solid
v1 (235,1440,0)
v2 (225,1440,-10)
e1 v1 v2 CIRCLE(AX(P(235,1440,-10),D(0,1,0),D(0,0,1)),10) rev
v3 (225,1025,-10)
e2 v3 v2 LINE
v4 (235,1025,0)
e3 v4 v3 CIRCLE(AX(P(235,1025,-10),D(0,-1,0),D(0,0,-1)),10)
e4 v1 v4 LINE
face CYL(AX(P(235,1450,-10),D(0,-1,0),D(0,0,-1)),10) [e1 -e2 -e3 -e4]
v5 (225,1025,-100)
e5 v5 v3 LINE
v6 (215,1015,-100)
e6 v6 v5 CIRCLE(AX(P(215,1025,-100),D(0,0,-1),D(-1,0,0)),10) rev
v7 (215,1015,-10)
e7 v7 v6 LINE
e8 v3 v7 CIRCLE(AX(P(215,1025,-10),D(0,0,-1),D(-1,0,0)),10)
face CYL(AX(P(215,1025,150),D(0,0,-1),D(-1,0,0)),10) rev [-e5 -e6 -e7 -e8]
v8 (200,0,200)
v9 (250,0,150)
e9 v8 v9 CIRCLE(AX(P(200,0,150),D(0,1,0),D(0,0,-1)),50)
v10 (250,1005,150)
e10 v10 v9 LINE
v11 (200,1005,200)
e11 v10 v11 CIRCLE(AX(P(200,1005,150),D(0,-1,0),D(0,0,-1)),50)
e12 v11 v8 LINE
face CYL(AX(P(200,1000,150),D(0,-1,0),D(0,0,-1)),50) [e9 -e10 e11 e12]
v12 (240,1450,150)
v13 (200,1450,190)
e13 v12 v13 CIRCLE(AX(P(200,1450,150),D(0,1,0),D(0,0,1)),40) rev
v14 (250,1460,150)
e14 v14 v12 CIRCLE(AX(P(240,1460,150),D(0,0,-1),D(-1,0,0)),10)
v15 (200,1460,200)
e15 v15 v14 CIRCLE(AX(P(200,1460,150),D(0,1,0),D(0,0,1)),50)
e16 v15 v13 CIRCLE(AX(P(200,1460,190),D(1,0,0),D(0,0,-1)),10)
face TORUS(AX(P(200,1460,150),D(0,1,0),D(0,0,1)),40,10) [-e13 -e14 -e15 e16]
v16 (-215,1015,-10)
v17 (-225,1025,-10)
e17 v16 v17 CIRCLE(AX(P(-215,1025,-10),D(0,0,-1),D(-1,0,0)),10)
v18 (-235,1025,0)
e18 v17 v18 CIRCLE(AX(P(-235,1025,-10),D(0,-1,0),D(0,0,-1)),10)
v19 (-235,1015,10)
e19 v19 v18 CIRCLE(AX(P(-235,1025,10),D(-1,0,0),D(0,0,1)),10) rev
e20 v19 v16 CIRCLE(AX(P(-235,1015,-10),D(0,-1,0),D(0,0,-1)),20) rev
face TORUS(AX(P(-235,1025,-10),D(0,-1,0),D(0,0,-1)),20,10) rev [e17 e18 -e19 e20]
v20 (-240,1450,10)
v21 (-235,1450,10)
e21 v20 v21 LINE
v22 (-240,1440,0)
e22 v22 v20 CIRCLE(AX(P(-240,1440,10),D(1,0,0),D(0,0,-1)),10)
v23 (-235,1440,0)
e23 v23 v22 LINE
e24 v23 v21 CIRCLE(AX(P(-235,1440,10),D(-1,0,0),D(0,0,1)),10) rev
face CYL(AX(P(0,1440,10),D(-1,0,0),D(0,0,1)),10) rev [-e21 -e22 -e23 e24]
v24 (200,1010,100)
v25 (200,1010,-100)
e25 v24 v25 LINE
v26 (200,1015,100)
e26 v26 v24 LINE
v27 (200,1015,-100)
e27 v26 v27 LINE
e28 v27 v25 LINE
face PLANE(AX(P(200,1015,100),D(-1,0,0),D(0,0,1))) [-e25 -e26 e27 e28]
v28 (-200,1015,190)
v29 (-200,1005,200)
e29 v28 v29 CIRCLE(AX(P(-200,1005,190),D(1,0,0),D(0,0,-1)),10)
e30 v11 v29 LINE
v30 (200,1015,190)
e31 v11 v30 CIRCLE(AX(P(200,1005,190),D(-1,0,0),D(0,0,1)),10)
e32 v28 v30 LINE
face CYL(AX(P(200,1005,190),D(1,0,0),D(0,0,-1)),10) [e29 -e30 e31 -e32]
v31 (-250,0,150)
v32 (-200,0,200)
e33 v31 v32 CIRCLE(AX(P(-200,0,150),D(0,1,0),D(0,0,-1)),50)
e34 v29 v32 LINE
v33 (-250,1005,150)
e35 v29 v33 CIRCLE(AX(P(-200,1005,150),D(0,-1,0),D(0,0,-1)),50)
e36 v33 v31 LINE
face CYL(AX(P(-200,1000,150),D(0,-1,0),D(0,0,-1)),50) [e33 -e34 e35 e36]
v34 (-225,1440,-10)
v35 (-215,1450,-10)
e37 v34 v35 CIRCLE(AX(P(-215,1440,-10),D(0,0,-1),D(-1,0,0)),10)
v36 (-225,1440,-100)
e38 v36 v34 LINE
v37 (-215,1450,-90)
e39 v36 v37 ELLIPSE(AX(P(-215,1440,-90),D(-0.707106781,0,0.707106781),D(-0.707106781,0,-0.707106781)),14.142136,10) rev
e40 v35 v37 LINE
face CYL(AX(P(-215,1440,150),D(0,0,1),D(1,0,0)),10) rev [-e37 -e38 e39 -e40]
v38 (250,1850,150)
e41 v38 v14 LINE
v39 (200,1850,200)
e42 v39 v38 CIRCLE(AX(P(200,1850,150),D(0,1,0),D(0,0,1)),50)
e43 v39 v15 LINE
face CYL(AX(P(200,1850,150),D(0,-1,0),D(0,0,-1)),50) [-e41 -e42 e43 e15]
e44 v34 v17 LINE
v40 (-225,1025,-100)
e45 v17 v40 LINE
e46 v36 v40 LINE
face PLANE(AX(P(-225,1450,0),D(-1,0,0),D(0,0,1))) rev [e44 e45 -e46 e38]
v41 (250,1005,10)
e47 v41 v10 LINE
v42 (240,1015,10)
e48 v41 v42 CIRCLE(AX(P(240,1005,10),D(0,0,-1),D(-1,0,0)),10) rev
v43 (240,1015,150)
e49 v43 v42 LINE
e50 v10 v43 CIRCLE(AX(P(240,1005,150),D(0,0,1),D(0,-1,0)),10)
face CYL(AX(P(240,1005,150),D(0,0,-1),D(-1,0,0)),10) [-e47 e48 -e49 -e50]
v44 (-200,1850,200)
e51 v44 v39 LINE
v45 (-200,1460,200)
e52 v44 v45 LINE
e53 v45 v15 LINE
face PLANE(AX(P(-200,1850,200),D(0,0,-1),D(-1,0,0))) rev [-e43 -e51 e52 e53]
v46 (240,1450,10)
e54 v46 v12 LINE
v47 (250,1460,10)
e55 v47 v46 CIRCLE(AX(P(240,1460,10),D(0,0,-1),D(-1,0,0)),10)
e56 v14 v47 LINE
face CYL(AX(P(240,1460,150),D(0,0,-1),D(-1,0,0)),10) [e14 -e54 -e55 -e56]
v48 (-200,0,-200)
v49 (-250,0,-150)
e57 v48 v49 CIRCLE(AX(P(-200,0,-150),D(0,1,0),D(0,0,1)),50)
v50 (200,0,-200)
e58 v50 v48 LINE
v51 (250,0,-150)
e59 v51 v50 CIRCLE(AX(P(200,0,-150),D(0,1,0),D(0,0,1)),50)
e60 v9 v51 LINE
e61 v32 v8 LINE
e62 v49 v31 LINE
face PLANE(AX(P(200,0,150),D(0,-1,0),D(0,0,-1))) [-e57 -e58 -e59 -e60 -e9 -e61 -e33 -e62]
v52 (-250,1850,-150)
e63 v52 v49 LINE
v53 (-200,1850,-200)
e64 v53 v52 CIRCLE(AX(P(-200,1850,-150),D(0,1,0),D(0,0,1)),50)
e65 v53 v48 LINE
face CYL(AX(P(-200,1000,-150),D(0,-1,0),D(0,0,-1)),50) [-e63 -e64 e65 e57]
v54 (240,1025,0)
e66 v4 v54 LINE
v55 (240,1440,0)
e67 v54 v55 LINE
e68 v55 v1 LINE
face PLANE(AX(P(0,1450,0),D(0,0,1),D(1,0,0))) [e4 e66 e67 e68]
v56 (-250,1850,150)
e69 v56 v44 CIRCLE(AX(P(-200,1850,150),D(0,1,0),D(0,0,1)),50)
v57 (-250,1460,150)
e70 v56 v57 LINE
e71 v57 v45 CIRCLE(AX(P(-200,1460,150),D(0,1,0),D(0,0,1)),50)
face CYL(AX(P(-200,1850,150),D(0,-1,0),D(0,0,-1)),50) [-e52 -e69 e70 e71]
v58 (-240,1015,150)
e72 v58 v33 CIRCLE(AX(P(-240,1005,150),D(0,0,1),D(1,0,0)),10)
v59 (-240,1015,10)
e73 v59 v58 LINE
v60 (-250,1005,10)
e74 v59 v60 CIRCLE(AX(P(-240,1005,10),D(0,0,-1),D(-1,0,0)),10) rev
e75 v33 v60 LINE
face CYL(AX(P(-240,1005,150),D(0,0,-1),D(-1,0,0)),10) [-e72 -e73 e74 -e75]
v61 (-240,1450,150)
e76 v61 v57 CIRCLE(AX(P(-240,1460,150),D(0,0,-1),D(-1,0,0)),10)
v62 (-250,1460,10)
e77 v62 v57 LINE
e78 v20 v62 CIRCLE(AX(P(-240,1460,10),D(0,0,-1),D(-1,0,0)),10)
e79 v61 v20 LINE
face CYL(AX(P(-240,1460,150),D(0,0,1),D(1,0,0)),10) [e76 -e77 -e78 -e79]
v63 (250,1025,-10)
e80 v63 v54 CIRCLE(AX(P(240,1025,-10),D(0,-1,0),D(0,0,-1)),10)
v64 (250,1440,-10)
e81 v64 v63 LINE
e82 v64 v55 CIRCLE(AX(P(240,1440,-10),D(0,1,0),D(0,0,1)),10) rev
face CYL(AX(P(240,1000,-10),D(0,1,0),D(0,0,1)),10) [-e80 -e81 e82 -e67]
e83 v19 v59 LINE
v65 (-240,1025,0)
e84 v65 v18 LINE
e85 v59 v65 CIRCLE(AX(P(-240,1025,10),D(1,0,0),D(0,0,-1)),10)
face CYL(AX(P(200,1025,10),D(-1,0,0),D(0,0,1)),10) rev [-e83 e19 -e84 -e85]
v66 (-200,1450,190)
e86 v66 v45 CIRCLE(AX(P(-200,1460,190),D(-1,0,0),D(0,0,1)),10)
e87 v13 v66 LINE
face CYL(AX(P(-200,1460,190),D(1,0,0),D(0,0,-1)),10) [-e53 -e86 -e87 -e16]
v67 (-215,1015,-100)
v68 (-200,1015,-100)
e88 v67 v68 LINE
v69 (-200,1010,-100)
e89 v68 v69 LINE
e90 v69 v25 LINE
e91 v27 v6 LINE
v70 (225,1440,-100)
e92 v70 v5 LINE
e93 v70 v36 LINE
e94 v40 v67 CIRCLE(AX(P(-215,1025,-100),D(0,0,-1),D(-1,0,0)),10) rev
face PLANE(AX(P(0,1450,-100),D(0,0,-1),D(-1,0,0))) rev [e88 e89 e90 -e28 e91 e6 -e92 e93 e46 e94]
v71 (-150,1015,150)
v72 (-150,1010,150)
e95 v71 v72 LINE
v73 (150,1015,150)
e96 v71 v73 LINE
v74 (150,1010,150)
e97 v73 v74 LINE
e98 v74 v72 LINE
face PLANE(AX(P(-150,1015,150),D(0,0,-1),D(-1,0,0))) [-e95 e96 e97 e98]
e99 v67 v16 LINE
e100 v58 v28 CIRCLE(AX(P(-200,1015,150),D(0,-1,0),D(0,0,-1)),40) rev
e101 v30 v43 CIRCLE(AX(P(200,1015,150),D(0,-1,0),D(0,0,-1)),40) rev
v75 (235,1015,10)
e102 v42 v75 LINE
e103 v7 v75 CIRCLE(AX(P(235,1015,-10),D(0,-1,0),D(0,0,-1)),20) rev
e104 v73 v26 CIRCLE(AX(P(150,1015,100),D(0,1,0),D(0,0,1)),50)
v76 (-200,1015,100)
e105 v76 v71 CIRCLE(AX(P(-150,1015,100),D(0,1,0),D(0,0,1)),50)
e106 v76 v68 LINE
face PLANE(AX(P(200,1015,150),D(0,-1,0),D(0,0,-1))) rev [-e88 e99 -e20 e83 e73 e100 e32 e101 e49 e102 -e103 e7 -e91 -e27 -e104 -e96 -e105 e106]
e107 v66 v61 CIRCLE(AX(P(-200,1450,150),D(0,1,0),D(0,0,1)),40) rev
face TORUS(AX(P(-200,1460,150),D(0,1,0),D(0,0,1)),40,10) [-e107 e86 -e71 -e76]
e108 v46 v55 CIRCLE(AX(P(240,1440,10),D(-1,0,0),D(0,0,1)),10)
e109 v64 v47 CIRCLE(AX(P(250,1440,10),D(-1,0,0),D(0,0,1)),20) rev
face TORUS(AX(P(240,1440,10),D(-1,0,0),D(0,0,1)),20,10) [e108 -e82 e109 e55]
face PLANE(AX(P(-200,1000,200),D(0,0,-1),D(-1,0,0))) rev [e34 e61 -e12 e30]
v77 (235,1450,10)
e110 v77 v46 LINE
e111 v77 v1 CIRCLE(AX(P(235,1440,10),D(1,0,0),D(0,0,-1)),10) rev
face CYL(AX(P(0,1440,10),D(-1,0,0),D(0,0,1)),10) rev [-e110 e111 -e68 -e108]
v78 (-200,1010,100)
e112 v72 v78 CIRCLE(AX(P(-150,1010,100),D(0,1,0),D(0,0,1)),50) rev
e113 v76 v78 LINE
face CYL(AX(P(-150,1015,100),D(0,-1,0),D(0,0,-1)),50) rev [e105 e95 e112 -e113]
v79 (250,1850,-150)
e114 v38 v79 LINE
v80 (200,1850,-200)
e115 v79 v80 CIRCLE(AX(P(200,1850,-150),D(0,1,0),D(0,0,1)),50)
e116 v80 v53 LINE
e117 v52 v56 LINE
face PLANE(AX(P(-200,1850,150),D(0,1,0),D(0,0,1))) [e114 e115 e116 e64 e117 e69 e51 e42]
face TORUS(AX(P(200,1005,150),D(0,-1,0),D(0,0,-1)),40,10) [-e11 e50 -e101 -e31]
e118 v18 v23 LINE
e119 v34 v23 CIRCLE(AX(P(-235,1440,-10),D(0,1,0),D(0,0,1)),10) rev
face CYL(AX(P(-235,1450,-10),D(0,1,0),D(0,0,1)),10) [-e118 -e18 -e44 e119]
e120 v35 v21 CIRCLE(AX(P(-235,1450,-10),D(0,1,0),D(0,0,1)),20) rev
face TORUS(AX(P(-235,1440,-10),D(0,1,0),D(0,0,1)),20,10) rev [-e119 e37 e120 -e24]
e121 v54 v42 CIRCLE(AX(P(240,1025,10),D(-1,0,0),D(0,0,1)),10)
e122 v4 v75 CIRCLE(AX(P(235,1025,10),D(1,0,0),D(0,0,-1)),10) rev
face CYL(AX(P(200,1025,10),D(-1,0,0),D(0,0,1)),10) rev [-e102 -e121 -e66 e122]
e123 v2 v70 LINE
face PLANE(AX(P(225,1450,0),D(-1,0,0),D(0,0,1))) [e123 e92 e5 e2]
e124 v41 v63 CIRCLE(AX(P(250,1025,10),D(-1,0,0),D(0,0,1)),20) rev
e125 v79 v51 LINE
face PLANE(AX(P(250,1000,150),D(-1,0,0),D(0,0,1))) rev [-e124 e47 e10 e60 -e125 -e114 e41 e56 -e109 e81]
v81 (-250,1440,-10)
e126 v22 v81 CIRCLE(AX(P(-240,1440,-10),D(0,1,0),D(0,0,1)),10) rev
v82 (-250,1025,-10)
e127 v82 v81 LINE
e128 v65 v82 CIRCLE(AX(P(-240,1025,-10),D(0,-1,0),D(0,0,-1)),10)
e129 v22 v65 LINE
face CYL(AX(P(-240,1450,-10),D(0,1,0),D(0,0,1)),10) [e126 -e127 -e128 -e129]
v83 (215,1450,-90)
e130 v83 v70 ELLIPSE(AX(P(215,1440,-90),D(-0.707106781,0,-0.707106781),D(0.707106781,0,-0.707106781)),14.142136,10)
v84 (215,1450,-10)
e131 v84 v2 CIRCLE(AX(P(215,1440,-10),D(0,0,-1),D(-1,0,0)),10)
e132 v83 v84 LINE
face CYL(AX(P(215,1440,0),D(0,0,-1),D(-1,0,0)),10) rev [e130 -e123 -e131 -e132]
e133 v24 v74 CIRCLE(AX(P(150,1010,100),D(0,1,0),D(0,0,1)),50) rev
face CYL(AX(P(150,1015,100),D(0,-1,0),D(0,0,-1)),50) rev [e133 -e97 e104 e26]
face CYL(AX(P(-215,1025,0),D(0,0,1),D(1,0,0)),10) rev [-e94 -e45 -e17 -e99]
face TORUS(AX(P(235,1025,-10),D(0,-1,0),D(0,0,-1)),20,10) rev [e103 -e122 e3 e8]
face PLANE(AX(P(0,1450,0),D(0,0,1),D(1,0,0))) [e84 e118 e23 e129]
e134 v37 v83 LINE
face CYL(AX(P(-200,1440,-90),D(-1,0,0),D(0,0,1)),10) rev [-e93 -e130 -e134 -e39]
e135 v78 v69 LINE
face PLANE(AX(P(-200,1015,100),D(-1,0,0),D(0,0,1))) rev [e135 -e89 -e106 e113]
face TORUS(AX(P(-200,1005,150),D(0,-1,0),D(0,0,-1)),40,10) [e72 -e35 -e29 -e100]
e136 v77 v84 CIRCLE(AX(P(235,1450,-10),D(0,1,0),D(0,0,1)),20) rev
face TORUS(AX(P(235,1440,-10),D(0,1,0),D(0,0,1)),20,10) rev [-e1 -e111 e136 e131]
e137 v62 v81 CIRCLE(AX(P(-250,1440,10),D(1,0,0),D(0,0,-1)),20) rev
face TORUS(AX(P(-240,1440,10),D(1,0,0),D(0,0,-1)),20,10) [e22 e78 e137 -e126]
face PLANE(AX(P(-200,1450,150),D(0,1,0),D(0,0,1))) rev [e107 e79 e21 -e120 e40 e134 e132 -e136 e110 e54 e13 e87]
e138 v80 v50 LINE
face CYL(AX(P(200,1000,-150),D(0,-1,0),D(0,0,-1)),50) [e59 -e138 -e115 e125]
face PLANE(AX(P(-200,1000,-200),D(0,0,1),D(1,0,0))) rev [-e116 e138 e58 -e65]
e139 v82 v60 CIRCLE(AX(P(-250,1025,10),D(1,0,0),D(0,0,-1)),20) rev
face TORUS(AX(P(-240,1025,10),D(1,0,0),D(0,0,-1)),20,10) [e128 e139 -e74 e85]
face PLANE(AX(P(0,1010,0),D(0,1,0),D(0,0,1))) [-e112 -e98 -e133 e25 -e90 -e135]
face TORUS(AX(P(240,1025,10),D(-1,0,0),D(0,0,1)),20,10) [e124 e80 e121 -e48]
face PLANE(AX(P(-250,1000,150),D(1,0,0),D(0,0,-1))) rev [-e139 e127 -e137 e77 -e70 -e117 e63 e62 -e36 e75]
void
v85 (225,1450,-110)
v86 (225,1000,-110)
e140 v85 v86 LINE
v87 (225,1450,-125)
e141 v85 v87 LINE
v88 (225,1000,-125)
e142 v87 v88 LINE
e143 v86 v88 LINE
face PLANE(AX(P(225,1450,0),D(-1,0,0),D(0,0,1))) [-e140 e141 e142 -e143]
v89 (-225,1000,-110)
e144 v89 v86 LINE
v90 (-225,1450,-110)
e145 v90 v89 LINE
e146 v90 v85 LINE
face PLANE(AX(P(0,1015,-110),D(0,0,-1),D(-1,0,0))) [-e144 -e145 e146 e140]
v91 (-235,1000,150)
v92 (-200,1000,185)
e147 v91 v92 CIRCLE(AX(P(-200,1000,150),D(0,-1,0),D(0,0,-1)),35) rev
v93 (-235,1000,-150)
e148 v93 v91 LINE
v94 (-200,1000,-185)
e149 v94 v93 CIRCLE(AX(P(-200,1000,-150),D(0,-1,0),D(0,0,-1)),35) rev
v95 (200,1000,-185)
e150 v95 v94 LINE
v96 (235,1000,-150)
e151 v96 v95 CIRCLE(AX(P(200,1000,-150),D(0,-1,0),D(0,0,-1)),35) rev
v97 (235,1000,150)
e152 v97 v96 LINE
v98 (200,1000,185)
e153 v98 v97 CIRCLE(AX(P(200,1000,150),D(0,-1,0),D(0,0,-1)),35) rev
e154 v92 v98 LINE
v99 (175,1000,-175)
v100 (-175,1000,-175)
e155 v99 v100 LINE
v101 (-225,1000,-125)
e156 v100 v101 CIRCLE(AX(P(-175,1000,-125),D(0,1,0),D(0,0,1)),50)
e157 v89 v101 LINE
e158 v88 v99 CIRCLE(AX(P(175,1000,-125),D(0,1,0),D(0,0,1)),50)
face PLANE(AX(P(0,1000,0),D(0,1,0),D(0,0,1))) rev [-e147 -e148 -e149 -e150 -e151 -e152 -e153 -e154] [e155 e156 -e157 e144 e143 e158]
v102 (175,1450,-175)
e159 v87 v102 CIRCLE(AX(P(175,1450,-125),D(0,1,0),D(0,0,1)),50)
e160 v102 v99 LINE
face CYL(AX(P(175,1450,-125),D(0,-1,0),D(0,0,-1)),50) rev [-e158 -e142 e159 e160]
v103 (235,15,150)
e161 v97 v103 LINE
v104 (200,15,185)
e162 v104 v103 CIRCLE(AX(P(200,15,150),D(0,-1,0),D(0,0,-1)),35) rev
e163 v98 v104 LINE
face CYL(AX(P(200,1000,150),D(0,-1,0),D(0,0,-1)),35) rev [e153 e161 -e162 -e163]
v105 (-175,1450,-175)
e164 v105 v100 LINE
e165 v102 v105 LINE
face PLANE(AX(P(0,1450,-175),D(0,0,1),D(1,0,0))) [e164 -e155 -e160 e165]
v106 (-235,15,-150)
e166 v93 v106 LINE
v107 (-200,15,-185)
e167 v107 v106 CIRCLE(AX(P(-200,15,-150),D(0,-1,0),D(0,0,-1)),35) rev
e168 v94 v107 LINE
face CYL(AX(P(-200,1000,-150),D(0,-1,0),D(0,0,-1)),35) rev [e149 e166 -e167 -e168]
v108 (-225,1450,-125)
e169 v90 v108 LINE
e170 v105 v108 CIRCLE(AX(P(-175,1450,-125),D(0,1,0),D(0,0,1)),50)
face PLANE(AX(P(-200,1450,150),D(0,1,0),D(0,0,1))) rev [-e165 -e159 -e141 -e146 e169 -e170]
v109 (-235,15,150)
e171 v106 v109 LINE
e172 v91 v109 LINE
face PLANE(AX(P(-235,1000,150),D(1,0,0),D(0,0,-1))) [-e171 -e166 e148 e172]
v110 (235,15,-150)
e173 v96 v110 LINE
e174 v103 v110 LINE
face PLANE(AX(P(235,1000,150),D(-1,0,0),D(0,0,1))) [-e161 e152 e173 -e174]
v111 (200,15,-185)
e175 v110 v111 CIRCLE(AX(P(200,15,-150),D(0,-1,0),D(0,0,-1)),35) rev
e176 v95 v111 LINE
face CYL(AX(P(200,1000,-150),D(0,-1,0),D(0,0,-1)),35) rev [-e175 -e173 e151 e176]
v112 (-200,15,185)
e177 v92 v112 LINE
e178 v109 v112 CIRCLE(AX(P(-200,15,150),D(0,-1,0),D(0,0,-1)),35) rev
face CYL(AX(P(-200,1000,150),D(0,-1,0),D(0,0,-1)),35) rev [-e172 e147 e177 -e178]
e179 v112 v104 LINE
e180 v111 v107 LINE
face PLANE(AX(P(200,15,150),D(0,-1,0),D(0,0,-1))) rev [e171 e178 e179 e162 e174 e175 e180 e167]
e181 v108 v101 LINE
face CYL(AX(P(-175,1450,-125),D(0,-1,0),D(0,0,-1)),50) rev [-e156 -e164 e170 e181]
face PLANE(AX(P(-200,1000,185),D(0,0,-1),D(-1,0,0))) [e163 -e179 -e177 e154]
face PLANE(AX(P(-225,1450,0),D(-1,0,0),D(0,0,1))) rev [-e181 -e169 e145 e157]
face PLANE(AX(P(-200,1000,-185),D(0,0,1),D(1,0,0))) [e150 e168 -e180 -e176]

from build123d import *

# Parameters (mm, degrees)
BOSS_EXTRUDE1_DEPTH = 1000
SHELL1_T            = -15
BOSS_EXTRUDE2_DEPTH = 10
BOSS_EXTRUDE3_DEPTH = 15
BOSS_EXTRUDE4_DEPTH = 450
BOSS_EXTRUDE7_DEPTH = 450
BOSS_EXTRUDE8_DEPTH = 400
FILLET3_R           = 10


# Read off the part's stored shape, not the designer's step: Boss-Extrude3
with BuildPart() as part:
    # Sketch1 → Boss-Extrude1 (new body)
    with BuildSketch(Plane(origin=(0, 0, 0), x_dir=(1, 0, 0), z_dir=(0, 1, 0))):
        with BuildLine():
            Line((-200, -200), (200, -200))
            ThreePointArc((200, -200), (235.355339059, -185.355339059), (250, -150))
            Line((250, -150), (250, 150))
            ThreePointArc((250, 150), (235.355339059, 185.355339059), (200, 200))
            Line((200, 200), (-200, 200))
            ThreePointArc((-200, 200), (-235.355339059, 185.355339059), (-250, 150))
            Line((-250, 150), (-250, -150))
            ThreePointArc((-250, -150), (-235.355339059, -185.355339059), (-200, -200))
        make_face()
    extrude(amount=BOSS_EXTRUDE1_DEPTH)

    # Shell1
    shell1_openings = [part.faces().sort_by_distance(p)[0] for p in [
        (0, 1000, 0),
    ]]
    offset(amount=SHELL1_T, openings=shell1_openings, kind=Kind.INTERSECTION)

    # Sketch3 → Boss-Extrude2 (add)
    with BuildSketch(Plane(origin=(0, 1000, 0), x_dir=(1, 0, 0), z_dir=(0, 1, 0))):
        with BuildLine():
            Line((200, 0), (200, 100))
            Line((200, 100), (-200, 100))
            Line((-200, 100), (-200, 0))
            Line((-200, 0), (-250, 0))
            Line((-250, 0), (-250, -150))
            ThreePointArc((-250, -150), (-235.355339059, -185.355339059), (-200, -200))
            Line((-200, -200), (200, -200))
            ThreePointArc((200, -200), (235.355339059, -185.355339059), (250, -150))
            Line((250, -150), (250, 0))
            Line((250, 0), (200, 0))
        make_face()
    extrude(amount=BOSS_EXTRUDE2_DEPTH)

    # Boss-Extrude3 outline → Boss-Extrude3 (add)
    with BuildSketch(Plane(origin=(0, 1000, 0), x_dir=(1, 0, 0), z_dir=(0, 1, 0))):
        with BuildLine():
            Line((200, 100), (200, -100))
            ThreePointArc((200, -100), (185.355339059, -135.355339059), (150, -150))
            Line((150, -150), (-150, -150))
            ThreePointArc((-150, -150), (-185.355339059, -135.355339059), (-200, -100))
            Line((-200, -100), (-200, 100))
            ThreePointArc((-200, 100), (-199.74680765, 105.0254481), (-198.989794856, 110))
            Line((-198.989794856, 110), (-225, 110))
            Line((-225, 110), (-225, 0))
            Line((-225, 0), (-250, 0))
            Line((-250, 0), (-250, -150))
            ThreePointArc((-250, -150), (-235.355339059, -185.355339059), (-200, -200))
            Line((-200, -200), (200, -200))
            ThreePointArc((200, -200), (235.355339059, -185.355339059), (250, -150))
            Line((250, -150), (250, 0))
            Line((250, 0), (225, 0))
            Line((225, 0), (225, 110))
            Line((225, 110), (198.989794856, 110))
            ThreePointArc((198.989794856, 110), (199.74680765, 105.0254481), (200, 100))
        make_face()
    extrude(amount=BOSS_EXTRUDE3_DEPTH)

    # Sketch3<5> → Boss-Extrude4 (add)
    with BuildSketch(Plane(origin=(0, 1000, 0), x_dir=(1, 0, 0), z_dir=(0, 1, 0))):
        with BuildLine():
            Line((-250, 0), (-225, 0))
            Line((-225, 0), (-225, 100))
            Line((-225, 100), (-225, 110))
            Line((-225, 110), (-225, 125))
            ThreePointArc((-225, 125), (-210.355339059, 160.355339059), (-175, 175))
            Line((-175, 175), (175, 175))
            ThreePointArc((175, 175), (210.355339059, 160.355339059), (225, 125))
            Line((225, 125), (225, 110))
            Line((225, 110), (225, 100))
            Line((225, 100), (225, 0))
            Line((225, 0), (250, 0))
            Line((250, 0), (250, 150))
            ThreePointArc((250, 150), (235.355339059, 185.355339059), (200, 200))
            Line((200, 200), (-200, 200))
            ThreePointArc((-200, 200), (-235.355339059, 185.355339059), (-250, 150))
            Line((-250, 150), (-250, 0))
        make_face()
    extrude(amount=BOSS_EXTRUDE4_DEPTH)

    # Sketch3<7> → Boss-Extrude7 (add)
    with BuildSketch(Plane(origin=(0, 1000, 0), x_dir=(1, 0, 0), z_dir=(0, 1, 0))):
        with BuildLine():
            ThreePointArc((-198.989794856, 110), (-199.74680765, 105.0254481), (-200, 100))
            Line((-200, 100), (200, 100))
            ThreePointArc((200, 100), (199.74680765, 105.0254481), (198.989794856, 110))
            Line((198.989794856, 110), (-198.989794856, 110))
        make_face()
        with BuildLine():
            ThreePointArc((198.989794856, 110), (199.74680765, 105.0254481), (200, 100))
            Line((200, 100), (225, 100))
            Line((225, 100), (225, 110))
            Line((225, 110), (198.989794856, 110))
        make_face()
        with BuildLine():
            Line((-225, 100), (-200, 100))
            ThreePointArc((-200, 100), (-199.74680765, 105.0254481), (-198.989794856, 110))
            Line((-198.989794856, 110), (-225, 110))
            Line((-225, 110), (-225, 100))
        make_face()
    extrude(amount=BOSS_EXTRUDE7_DEPTH)

    # Sketch5 → Boss-Extrude8 (add)
    with BuildSketch(Plane(origin=(0, 1450, 0), x_dir=(1, 0, 0), z_dir=(0, 1, 0))):
        with BuildLine():
            Line((-200, -200), (200, -200))
            ThreePointArc((200, -200), (235.355339059, -185.355339059), (250, -150))
            Line((250, -150), (250, 150))
            ThreePointArc((250, 150), (235.355339059, 185.355339059), (200, 200))
            Line((200, 200), (-200, 200))
            ThreePointArc((-200, 200), (-235.355339059, 185.355339059), (-250, 150))
            Line((-250, 150), (-250, -150))
            ThreePointArc((-250, -150), (-235.355339059, -185.355339059), (-200, -200))
        make_face()
    extrude(amount=BOSS_EXTRUDE8_DEPTH)

    # Fillet3
    fillet3_edges = [part.edges().sort_by_distance(p)[0] for p in [
        (-225, 1232.5, 0),
        (225, 1450, -50),
        (237.5, 1450, 0),
        (225, 1232.5, 0),
        (-237.5, 1450, 0),
        (-250, 1232.5, 0),
        (250, 1232.5, 0),
        (-225, 1450, -50),
        (0, 1450, -100),
        (-235.355339059, 1450, 185.355339059),
        (0, 1450, 200),
        (235.355339059, 1450, 185.355339059),
        (250, 1450, 75),
        (-250, 1450, 75),
        (-237.5, 1015, 0),
        (0, 1015, 200),
        (250, 1015, 75),
        (237.5, 1015, 0),
        (225, 1015, -50),
        (235.355339059, 1015, 185.355339059),
        (-250, 1015, 75),
        (-235.355339059, 1015, 185.355339059),
        (-225, 1015, -50),
    ]]
    fillet(fillet3_edges, radius=FILLET3_R)


solid = part.part
